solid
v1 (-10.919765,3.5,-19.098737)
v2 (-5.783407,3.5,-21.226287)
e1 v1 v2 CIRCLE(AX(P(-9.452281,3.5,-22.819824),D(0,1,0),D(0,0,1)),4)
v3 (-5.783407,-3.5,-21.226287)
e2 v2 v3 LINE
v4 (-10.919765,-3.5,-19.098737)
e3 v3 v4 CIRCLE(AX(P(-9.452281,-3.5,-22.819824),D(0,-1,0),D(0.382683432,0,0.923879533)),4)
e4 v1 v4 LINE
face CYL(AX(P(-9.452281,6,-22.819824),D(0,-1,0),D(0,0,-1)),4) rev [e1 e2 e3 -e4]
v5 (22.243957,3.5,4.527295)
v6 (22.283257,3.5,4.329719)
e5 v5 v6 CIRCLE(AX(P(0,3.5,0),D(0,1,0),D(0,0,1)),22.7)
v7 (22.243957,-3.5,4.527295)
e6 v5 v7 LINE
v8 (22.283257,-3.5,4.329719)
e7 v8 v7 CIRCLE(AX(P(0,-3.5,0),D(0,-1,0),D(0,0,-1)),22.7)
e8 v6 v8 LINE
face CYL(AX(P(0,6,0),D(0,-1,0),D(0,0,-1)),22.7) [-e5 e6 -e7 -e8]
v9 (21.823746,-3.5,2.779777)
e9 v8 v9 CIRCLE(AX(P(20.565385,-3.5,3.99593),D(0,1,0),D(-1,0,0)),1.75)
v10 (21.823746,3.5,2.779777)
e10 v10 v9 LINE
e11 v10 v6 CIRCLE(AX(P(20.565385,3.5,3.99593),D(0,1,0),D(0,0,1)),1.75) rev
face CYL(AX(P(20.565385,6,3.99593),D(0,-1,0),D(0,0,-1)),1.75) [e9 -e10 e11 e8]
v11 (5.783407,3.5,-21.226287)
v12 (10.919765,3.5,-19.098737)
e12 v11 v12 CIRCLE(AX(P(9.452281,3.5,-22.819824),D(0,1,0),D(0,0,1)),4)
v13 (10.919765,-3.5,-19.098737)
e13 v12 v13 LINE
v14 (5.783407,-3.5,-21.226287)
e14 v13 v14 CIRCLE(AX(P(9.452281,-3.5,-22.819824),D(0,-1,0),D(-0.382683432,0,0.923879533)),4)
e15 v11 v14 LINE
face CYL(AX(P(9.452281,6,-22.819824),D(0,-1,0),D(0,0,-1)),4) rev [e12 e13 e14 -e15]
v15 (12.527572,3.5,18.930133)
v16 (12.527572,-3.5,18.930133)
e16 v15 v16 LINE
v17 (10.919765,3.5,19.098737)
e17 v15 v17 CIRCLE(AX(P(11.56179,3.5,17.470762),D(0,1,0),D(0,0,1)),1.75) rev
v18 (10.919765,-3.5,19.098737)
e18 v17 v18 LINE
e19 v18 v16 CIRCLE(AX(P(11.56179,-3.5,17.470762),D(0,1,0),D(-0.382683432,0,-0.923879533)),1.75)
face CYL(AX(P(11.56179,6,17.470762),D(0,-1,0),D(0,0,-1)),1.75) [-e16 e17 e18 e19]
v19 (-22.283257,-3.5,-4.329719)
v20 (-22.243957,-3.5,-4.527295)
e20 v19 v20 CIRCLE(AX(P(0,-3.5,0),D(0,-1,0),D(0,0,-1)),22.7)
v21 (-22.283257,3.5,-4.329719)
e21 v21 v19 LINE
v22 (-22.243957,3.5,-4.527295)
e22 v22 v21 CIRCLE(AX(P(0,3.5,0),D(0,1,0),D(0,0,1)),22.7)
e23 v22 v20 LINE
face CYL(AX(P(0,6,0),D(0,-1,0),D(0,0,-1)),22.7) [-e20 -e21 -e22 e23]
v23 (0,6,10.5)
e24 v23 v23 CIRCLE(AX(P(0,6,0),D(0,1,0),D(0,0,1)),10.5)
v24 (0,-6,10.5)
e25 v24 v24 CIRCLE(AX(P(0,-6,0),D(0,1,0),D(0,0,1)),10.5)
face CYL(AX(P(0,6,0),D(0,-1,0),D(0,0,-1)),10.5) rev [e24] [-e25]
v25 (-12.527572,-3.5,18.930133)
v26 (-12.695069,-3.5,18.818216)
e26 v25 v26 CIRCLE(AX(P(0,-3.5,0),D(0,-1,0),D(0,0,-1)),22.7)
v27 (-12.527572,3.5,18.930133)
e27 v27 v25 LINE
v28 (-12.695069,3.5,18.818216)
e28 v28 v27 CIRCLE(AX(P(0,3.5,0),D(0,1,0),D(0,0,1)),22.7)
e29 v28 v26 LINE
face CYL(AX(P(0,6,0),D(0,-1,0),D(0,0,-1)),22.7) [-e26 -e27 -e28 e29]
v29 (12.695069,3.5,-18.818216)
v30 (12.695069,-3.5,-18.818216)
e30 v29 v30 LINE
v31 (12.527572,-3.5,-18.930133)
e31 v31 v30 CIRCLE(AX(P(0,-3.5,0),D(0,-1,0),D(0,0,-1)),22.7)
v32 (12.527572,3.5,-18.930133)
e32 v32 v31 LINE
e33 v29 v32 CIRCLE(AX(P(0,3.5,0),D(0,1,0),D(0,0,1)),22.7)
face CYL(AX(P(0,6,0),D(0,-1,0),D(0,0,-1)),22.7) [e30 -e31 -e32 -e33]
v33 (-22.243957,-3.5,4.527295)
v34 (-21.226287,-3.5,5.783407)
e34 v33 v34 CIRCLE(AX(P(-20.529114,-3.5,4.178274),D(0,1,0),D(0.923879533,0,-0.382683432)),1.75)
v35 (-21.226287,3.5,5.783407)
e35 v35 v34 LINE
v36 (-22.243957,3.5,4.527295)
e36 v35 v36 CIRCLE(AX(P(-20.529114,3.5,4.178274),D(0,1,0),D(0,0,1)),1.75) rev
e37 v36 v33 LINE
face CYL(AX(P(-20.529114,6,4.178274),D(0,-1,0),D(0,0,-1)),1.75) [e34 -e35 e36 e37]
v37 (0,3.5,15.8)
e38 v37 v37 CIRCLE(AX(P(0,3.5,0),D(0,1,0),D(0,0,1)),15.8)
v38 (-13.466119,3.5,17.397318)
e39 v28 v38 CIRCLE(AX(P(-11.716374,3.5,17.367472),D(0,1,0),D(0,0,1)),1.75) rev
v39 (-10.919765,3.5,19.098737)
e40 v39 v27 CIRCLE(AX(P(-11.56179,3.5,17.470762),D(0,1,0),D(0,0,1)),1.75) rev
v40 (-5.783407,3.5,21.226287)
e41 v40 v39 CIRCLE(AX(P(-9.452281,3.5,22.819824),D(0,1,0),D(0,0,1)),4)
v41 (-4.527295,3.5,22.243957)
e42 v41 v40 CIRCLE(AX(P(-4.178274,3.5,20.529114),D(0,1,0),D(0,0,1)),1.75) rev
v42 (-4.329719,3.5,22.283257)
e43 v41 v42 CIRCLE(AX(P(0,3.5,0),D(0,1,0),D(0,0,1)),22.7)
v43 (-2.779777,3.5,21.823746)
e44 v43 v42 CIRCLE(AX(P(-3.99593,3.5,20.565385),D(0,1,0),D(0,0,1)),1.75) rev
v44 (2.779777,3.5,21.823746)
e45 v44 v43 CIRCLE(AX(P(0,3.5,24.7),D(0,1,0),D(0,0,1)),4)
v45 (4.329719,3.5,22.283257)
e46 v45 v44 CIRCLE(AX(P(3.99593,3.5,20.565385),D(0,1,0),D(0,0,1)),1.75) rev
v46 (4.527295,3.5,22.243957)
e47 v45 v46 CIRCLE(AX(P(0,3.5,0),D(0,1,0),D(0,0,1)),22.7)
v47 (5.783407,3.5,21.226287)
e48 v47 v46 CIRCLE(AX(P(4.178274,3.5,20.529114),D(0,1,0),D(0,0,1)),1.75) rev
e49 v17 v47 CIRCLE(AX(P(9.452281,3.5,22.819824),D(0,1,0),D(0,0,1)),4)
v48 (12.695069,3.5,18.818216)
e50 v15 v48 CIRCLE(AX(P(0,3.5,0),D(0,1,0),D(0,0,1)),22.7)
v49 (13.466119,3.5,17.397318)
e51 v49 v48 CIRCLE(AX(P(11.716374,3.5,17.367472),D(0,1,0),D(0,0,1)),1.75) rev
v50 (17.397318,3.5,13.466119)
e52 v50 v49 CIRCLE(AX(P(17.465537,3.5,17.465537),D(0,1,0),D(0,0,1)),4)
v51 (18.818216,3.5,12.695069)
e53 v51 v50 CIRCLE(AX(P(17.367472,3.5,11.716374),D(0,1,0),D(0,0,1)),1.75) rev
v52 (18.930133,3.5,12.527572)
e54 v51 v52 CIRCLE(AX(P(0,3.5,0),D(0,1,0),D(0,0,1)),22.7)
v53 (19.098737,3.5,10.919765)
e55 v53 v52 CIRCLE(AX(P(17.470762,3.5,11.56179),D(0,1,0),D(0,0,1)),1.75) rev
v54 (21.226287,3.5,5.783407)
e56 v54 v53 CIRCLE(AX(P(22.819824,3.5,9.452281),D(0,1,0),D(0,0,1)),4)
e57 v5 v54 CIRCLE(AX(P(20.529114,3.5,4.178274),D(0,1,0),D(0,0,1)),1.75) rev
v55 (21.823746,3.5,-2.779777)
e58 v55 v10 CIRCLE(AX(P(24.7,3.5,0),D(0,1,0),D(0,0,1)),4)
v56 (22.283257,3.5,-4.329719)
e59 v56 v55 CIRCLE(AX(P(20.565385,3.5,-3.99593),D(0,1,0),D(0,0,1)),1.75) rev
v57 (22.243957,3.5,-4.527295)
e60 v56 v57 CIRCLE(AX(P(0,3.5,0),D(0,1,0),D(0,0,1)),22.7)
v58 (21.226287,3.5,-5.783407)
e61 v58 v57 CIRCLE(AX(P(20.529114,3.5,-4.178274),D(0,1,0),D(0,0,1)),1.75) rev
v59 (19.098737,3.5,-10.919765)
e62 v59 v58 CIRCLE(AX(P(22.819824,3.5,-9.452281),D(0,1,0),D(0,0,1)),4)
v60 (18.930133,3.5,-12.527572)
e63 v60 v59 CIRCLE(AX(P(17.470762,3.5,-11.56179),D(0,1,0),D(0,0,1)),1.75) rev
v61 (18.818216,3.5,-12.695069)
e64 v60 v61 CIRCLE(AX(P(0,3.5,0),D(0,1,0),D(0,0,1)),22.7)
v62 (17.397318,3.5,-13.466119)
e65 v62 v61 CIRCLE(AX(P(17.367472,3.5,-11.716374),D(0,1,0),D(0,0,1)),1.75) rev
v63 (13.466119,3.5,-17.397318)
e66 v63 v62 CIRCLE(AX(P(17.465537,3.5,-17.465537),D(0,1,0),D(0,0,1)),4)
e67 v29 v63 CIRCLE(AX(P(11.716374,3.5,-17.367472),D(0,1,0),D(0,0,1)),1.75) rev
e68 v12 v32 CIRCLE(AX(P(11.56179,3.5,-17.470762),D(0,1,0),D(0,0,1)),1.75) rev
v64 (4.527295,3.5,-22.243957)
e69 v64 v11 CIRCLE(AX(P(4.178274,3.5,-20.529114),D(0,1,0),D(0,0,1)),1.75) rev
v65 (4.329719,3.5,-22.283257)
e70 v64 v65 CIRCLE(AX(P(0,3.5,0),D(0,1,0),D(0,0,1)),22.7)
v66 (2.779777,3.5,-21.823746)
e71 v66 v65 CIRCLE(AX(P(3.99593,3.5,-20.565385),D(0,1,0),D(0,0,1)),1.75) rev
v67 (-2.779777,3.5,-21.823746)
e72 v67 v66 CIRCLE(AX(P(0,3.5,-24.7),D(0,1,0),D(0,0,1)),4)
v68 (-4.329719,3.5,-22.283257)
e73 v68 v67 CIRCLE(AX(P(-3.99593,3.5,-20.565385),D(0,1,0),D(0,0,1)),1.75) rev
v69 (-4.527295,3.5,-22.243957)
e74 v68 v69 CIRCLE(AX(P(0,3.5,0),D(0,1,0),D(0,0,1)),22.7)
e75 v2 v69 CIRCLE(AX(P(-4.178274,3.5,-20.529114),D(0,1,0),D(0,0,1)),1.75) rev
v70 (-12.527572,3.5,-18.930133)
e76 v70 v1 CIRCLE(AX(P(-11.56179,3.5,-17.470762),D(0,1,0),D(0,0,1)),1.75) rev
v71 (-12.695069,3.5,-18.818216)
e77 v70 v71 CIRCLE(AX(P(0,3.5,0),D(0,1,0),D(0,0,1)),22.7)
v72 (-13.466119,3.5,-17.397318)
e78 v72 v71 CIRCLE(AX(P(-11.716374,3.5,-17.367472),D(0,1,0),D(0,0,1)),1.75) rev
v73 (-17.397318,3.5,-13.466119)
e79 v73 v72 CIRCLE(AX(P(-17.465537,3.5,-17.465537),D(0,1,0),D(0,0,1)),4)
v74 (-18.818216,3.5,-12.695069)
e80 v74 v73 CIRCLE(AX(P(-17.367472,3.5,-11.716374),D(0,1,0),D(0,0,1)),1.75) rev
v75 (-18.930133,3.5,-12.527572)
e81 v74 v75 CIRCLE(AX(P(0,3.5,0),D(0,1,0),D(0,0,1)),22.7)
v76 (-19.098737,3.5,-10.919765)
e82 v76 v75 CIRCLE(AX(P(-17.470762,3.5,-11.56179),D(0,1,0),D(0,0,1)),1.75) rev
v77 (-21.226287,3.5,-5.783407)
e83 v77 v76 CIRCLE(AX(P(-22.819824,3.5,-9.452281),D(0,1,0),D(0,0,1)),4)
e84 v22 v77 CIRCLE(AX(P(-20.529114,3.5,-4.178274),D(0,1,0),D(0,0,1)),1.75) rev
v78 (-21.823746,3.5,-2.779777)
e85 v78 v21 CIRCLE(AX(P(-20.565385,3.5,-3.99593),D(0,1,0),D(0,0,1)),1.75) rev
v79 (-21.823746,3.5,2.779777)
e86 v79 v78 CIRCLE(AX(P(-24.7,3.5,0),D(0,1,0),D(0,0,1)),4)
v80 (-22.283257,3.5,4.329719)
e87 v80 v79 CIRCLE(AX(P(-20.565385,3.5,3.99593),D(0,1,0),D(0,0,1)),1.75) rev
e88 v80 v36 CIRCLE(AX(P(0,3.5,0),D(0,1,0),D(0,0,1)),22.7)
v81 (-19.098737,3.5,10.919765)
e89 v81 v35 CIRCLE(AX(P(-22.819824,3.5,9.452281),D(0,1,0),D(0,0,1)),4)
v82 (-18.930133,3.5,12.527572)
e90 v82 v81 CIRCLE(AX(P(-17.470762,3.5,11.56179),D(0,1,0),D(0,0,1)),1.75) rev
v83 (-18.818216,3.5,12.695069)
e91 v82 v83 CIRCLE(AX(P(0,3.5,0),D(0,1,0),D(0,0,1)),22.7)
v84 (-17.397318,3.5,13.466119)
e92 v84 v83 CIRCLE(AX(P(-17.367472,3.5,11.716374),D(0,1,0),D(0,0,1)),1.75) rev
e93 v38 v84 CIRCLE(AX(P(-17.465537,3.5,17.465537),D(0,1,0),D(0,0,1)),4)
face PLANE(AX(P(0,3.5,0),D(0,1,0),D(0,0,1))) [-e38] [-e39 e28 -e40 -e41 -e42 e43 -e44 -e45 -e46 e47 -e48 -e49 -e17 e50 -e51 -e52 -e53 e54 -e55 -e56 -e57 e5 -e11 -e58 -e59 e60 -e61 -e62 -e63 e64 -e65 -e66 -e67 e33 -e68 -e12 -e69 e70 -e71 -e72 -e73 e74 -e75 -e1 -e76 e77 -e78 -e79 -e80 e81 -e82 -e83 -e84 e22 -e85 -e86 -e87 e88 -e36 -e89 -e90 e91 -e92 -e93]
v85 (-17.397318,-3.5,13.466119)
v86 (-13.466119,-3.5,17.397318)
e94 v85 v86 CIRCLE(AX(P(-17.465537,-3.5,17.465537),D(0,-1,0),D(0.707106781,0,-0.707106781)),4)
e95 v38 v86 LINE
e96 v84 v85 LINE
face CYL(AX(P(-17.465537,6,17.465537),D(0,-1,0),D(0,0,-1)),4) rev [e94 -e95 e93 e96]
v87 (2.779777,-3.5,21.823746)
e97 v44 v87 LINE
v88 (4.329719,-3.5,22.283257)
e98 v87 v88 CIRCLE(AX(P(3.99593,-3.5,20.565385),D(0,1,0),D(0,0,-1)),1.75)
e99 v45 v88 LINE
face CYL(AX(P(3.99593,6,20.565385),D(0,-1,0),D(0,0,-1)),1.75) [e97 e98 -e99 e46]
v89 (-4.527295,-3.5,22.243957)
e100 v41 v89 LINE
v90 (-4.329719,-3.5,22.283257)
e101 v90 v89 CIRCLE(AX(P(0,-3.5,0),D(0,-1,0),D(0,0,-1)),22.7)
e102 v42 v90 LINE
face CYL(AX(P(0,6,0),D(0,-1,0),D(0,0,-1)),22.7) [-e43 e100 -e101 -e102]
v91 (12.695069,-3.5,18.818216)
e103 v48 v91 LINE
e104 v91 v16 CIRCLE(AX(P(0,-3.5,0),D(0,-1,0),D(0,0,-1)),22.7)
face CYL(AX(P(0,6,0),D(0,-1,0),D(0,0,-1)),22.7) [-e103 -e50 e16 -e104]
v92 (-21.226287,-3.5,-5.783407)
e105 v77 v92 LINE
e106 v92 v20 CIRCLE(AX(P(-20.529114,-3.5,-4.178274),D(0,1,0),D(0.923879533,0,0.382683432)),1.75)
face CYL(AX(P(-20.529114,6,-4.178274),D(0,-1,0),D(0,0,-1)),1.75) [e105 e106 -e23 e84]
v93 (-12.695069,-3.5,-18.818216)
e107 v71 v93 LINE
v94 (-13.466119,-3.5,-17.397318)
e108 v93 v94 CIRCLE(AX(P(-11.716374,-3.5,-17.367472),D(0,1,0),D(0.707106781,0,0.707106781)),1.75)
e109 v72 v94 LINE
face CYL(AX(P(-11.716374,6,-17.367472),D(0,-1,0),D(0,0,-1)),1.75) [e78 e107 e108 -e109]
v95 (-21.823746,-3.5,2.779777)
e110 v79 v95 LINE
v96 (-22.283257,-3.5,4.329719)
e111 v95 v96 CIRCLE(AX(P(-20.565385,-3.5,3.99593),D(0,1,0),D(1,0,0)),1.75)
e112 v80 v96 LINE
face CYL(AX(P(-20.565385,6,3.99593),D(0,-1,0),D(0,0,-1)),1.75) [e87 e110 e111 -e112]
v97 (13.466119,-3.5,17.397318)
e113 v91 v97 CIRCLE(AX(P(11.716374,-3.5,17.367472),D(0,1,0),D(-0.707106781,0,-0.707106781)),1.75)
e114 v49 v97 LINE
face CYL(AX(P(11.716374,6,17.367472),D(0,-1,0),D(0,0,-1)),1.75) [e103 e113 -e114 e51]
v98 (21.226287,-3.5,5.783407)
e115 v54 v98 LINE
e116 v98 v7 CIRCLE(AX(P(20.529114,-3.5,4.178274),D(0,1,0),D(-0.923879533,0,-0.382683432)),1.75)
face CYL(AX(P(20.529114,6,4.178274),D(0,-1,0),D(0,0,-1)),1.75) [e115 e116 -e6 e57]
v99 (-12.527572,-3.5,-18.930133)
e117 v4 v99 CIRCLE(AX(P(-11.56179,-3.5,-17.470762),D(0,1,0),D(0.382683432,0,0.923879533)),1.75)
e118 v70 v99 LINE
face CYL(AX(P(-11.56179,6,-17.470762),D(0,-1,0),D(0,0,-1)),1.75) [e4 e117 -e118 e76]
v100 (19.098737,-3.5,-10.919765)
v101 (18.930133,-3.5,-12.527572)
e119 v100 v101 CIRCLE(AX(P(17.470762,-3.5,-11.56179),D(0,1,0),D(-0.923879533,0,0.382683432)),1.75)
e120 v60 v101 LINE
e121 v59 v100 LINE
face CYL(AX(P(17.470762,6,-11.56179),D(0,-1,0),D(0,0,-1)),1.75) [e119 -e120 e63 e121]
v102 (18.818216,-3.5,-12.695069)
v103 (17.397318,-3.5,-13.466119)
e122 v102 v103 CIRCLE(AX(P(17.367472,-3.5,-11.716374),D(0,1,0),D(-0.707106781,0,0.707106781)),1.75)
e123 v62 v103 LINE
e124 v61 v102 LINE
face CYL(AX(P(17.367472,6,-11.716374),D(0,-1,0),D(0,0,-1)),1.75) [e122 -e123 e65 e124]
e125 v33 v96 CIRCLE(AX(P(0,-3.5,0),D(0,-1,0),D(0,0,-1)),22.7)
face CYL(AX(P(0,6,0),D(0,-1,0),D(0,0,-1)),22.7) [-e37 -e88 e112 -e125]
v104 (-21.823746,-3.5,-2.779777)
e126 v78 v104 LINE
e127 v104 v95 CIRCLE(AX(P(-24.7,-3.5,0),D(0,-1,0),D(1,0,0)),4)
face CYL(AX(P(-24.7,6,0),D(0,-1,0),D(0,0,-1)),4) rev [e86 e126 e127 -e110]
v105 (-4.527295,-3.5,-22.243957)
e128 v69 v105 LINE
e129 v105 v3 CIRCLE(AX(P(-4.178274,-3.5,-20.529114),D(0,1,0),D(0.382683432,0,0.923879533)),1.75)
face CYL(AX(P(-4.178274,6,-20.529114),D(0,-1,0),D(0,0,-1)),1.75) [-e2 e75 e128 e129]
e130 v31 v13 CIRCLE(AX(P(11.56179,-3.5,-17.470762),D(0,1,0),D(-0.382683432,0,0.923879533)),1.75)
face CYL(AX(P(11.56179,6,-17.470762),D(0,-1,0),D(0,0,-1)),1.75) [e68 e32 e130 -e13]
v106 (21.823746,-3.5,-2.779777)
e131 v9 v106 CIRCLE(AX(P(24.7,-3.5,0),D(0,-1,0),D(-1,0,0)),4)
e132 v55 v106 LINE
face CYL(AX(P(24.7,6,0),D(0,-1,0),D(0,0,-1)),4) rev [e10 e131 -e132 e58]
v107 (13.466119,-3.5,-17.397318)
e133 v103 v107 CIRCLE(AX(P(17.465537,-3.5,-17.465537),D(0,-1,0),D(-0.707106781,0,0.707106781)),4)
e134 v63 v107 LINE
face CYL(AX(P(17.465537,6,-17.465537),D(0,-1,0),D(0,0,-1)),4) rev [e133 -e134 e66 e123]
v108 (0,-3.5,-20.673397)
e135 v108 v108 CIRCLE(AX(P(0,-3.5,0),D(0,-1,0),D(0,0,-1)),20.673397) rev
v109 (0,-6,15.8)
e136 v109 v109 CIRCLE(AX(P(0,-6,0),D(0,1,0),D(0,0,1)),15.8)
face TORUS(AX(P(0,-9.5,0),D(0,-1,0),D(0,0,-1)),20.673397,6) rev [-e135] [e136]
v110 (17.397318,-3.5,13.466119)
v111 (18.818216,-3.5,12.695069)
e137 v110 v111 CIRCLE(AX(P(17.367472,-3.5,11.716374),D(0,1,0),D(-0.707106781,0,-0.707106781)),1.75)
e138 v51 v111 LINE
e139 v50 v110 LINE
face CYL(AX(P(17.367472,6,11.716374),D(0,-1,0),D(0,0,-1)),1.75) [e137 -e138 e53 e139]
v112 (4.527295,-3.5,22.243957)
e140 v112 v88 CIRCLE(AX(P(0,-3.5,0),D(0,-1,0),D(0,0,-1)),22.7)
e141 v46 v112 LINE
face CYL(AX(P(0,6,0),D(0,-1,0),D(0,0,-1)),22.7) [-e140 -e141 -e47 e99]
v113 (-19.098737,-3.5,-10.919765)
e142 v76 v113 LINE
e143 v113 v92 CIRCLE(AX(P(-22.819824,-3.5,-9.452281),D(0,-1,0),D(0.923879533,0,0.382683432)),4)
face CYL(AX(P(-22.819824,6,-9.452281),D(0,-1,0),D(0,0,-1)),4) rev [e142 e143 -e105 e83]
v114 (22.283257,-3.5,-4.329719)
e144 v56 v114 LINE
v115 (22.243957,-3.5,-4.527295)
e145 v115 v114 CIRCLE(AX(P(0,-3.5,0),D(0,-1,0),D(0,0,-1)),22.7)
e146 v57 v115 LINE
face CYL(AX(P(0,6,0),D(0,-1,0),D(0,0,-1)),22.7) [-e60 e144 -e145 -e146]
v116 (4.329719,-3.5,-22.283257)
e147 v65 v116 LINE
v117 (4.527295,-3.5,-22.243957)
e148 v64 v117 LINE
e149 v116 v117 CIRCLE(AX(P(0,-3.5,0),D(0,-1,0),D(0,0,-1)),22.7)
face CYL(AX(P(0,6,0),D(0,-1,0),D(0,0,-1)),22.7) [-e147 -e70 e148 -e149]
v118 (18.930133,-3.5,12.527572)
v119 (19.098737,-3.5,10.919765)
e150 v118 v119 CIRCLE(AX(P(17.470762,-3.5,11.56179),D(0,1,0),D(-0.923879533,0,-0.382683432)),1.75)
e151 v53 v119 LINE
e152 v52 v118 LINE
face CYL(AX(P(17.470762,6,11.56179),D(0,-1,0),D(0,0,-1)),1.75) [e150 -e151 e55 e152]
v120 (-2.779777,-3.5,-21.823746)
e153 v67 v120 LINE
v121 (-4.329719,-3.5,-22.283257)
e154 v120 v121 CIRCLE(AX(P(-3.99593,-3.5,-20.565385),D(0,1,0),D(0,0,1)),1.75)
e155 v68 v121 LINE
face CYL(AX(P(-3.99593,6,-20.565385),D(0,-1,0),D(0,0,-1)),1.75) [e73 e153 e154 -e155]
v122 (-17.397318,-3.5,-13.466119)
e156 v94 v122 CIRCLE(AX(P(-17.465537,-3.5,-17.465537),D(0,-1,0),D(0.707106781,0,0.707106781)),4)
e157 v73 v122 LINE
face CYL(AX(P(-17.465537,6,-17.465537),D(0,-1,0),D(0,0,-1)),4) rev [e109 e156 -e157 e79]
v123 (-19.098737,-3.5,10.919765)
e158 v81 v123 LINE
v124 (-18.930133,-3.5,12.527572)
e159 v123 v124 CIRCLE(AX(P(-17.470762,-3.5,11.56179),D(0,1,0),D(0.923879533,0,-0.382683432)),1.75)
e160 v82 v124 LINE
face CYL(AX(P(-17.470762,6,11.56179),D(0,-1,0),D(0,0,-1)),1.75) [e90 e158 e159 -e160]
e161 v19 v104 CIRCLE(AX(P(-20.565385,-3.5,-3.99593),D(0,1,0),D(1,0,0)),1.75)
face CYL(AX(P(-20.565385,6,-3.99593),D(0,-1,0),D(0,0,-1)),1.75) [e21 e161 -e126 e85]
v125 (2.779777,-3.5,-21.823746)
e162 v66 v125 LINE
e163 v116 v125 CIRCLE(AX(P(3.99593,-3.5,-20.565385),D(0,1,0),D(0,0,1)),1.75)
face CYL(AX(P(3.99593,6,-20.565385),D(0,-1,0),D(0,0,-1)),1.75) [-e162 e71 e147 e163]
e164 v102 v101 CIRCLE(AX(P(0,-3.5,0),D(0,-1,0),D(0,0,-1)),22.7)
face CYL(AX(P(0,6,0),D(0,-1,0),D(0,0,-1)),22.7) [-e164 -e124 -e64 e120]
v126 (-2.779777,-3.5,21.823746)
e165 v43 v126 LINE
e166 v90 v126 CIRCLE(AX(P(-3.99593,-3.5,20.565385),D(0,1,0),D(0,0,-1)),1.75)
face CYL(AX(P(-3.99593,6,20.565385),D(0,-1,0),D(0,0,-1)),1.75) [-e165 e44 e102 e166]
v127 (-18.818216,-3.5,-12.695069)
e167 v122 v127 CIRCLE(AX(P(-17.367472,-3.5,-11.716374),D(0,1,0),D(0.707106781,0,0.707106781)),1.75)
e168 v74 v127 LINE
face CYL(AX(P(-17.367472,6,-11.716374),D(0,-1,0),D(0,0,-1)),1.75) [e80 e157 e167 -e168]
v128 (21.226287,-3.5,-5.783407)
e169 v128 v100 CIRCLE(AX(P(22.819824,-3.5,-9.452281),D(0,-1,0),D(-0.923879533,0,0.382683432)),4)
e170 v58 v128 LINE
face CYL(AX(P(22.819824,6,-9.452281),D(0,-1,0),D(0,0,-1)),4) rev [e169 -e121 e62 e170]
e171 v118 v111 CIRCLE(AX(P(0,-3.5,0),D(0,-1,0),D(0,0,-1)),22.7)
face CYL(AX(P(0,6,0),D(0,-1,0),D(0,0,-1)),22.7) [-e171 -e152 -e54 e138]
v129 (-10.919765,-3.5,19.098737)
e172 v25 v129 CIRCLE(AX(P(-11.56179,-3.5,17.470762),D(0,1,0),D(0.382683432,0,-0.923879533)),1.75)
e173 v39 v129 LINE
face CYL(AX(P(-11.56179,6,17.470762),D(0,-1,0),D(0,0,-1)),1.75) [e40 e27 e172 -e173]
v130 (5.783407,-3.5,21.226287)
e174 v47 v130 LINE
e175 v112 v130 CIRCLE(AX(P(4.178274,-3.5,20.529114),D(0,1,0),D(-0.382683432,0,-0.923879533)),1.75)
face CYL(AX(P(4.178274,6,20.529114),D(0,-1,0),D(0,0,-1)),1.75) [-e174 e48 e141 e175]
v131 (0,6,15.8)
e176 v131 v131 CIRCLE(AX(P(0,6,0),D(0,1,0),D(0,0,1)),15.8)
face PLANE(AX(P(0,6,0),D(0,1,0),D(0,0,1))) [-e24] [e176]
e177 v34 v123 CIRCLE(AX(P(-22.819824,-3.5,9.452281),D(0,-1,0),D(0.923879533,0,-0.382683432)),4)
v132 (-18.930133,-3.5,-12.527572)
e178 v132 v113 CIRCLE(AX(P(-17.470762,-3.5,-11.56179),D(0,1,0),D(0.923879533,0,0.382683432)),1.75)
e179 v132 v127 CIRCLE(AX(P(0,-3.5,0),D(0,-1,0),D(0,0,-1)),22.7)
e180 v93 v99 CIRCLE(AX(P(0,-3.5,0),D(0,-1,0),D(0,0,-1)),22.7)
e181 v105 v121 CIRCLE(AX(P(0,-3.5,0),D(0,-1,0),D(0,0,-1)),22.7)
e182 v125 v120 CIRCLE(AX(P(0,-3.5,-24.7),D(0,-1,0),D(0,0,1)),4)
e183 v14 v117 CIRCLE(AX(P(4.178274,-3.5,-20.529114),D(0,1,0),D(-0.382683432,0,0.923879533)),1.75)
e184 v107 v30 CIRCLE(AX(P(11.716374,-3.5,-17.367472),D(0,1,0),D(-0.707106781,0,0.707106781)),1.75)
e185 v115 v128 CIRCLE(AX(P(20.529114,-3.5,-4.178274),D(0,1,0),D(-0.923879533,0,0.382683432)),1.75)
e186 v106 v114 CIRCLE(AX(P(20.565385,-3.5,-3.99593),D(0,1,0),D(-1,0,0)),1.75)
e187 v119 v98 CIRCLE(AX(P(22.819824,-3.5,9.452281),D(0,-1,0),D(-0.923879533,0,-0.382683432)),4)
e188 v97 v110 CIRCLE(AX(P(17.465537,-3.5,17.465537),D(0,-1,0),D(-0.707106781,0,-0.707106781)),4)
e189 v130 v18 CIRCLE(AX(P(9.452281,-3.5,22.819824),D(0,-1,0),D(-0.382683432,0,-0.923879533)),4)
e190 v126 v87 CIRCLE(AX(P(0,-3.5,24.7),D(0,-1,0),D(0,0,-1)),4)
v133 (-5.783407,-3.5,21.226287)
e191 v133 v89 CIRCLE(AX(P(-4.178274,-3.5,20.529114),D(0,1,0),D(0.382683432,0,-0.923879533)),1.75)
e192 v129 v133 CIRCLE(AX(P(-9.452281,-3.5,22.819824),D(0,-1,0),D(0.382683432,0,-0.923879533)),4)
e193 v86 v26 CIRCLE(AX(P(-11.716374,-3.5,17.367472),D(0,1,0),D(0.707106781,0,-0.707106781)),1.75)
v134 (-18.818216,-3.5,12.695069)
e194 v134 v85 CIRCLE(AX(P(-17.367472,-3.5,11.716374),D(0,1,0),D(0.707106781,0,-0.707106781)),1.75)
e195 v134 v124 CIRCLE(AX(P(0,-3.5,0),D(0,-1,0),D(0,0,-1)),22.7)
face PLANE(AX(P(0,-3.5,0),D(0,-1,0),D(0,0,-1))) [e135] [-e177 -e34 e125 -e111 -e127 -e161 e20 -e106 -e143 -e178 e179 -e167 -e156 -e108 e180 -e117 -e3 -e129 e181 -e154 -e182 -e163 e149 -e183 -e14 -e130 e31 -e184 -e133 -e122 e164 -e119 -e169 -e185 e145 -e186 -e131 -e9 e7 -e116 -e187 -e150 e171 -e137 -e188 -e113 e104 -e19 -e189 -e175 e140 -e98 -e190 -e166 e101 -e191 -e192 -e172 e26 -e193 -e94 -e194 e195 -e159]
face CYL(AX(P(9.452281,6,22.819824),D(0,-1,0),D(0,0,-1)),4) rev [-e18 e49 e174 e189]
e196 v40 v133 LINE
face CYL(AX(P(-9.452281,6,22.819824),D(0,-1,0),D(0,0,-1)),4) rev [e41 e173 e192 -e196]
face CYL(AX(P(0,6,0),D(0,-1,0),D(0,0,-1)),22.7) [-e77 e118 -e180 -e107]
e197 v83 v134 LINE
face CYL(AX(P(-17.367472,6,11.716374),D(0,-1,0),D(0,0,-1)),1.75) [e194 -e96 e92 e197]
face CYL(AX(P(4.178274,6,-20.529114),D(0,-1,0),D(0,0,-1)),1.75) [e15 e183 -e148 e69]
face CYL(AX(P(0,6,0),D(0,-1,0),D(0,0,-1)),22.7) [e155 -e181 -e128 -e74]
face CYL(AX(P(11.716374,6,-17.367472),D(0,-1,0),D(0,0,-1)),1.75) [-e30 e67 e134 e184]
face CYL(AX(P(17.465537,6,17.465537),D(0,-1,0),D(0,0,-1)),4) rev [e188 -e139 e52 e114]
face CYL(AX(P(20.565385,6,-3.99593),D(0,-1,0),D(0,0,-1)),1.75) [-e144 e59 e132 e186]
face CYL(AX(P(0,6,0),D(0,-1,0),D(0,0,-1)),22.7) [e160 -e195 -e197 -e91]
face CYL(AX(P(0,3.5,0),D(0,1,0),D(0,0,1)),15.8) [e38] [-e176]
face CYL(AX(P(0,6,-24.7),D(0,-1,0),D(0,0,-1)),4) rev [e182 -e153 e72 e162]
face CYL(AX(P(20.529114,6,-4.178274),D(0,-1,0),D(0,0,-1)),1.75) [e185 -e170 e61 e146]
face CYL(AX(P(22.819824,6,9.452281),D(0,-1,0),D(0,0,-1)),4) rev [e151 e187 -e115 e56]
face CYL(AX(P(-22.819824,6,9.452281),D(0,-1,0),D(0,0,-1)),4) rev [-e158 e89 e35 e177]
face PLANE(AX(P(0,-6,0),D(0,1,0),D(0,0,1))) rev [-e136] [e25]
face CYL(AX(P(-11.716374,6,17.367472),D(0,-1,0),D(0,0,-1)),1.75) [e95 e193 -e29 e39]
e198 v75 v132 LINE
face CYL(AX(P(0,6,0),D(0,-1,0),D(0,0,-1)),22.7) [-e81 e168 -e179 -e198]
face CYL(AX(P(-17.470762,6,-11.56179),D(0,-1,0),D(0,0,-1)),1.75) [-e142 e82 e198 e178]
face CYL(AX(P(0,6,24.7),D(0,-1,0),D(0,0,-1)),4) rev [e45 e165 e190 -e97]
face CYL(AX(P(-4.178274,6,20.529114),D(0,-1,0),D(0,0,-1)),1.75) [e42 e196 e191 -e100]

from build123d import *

# Parameters (mm, degrees)
SKETCH1_R           = 22.7
SKETCH1_R_2         = 10.5
BOSS_EXTRUDE1_DEPTH = 6
SKETCH2_OUTSIDE_W   = 60.464
SKETCH2_OUTSIDE_H   = 60.464
SKETCH2_OUTSIDE_R   = 15.8
CUT_EXTRUDE1_DEPTH  = 2.5
FILLET1_R           = 6
CUT_EXTRUDE2_DEPTH  = 34.478799262
CIRPATTERN1_COUNT   = 16


with BuildPart() as part:
    # Sketch1 → Boss-Extrude1 (new, symmetric)
    with BuildSketch(Plane(origin=(0, 0, 0), x_dir=(1, 0, 0), z_dir=(0, 1, 0))):
        with Locations(Location((0, 0, 0), (0, 0, 270))):
            Circle(SKETCH1_R)
        with Locations(Location((0, 0, 0), (0, 0, 270))):
            Circle(SKETCH1_R_2, mode=Mode.SUBTRACT)
    extrude(amount=BOSS_EXTRUDE1_DEPTH, both=True)

    # Sketch2 outside → Cut-Extrude1 (cut)
    with BuildSketch(Plane(origin=(0, 6, 0), x_dir=(1, 0, 0), z_dir=(0, 1, 0))):
        Rectangle(SKETCH2_OUTSIDE_W, SKETCH2_OUTSIDE_H)
        with Locations(Location((0, 0, 0), (0, 0, 270))):
            Circle(SKETCH2_OUTSIDE_R, mode=Mode.SUBTRACT)
    cut_extrude1 = extrude(amount=-CUT_EXTRUDE1_DEPTH, mode=Mode.SUBTRACT)

    # Mirror1: Cut-Extrude1 across plane
    add(cut_extrude1.mirror(Plane.ZX), mode=Mode.SUBTRACT)

    # Fillet1
    # the kernel refuses this fillet: 6 mm, written as the material it adds along each edge
    with BuildSketch(Plane(origin=(0, -3.5, 0), x_dir=(0, 0, 1), z_dir=(-1, 0, 0))) as fillet1_piece_1:
        with BuildLine():
            CenterArc((20.673397172, -6), FILLET1_R, 90, 54.314665287)
            Line((15.8, -2.5), (15.702532057, -2.43))
            ThreePointArc((15.702532057, -2.43), (15.68, -1.25), (15.68, 0))
            Line((15.68, 0), (15.8, 0.12))
            Line((15.8, 0.12), (20.673397172, 0.12))
            Line((20.673397172, 0.12), (20.673397172, 0))
        make_face()
    revolve(axis=Axis((0, -3.5, 0), (0, 1, 0)))

    # Sketch3 → Cut-Extrude2 (cut, through all)
    with BuildSketch(Plane.XZ.offset(3.5)):
        with BuildLine():
            ThreePointArc((-2.779777309, 21.823745819), (0, 20.7), (2.779777309, 21.823745819))
            ThreePointArc((2.779777309, 21.823745819), (3.498507516, 22.243201944), (4.329718774, 22.283256839))
            ThreePointArc((4.329718774, 22.283256839), (0, 22.7), (-4.329718774, 22.283256839))
            ThreePointArc((-4.329718774, 22.283256839), (-3.498507516, 22.243201944), (-2.779777309, 21.823745819))
        make_face()
    cut_extrude2 = extrude(amount=-CUT_EXTRUDE2_DEPTH, mode=Mode.SUBTRACT)

    # CirPattern1: Cut-Extrude2 ×16 about axis
    cirpattern1_axis = Axis((0, 0, 0), (0, 1, 0))
    for i in range(1, CIRPATTERN1_COUNT):
        add(cut_extrude2.rotate(cirpattern1_axis, i * 360 / CIRPATTERN1_COUNT), mode=Mode.SUBTRACT)


solid = part.part
